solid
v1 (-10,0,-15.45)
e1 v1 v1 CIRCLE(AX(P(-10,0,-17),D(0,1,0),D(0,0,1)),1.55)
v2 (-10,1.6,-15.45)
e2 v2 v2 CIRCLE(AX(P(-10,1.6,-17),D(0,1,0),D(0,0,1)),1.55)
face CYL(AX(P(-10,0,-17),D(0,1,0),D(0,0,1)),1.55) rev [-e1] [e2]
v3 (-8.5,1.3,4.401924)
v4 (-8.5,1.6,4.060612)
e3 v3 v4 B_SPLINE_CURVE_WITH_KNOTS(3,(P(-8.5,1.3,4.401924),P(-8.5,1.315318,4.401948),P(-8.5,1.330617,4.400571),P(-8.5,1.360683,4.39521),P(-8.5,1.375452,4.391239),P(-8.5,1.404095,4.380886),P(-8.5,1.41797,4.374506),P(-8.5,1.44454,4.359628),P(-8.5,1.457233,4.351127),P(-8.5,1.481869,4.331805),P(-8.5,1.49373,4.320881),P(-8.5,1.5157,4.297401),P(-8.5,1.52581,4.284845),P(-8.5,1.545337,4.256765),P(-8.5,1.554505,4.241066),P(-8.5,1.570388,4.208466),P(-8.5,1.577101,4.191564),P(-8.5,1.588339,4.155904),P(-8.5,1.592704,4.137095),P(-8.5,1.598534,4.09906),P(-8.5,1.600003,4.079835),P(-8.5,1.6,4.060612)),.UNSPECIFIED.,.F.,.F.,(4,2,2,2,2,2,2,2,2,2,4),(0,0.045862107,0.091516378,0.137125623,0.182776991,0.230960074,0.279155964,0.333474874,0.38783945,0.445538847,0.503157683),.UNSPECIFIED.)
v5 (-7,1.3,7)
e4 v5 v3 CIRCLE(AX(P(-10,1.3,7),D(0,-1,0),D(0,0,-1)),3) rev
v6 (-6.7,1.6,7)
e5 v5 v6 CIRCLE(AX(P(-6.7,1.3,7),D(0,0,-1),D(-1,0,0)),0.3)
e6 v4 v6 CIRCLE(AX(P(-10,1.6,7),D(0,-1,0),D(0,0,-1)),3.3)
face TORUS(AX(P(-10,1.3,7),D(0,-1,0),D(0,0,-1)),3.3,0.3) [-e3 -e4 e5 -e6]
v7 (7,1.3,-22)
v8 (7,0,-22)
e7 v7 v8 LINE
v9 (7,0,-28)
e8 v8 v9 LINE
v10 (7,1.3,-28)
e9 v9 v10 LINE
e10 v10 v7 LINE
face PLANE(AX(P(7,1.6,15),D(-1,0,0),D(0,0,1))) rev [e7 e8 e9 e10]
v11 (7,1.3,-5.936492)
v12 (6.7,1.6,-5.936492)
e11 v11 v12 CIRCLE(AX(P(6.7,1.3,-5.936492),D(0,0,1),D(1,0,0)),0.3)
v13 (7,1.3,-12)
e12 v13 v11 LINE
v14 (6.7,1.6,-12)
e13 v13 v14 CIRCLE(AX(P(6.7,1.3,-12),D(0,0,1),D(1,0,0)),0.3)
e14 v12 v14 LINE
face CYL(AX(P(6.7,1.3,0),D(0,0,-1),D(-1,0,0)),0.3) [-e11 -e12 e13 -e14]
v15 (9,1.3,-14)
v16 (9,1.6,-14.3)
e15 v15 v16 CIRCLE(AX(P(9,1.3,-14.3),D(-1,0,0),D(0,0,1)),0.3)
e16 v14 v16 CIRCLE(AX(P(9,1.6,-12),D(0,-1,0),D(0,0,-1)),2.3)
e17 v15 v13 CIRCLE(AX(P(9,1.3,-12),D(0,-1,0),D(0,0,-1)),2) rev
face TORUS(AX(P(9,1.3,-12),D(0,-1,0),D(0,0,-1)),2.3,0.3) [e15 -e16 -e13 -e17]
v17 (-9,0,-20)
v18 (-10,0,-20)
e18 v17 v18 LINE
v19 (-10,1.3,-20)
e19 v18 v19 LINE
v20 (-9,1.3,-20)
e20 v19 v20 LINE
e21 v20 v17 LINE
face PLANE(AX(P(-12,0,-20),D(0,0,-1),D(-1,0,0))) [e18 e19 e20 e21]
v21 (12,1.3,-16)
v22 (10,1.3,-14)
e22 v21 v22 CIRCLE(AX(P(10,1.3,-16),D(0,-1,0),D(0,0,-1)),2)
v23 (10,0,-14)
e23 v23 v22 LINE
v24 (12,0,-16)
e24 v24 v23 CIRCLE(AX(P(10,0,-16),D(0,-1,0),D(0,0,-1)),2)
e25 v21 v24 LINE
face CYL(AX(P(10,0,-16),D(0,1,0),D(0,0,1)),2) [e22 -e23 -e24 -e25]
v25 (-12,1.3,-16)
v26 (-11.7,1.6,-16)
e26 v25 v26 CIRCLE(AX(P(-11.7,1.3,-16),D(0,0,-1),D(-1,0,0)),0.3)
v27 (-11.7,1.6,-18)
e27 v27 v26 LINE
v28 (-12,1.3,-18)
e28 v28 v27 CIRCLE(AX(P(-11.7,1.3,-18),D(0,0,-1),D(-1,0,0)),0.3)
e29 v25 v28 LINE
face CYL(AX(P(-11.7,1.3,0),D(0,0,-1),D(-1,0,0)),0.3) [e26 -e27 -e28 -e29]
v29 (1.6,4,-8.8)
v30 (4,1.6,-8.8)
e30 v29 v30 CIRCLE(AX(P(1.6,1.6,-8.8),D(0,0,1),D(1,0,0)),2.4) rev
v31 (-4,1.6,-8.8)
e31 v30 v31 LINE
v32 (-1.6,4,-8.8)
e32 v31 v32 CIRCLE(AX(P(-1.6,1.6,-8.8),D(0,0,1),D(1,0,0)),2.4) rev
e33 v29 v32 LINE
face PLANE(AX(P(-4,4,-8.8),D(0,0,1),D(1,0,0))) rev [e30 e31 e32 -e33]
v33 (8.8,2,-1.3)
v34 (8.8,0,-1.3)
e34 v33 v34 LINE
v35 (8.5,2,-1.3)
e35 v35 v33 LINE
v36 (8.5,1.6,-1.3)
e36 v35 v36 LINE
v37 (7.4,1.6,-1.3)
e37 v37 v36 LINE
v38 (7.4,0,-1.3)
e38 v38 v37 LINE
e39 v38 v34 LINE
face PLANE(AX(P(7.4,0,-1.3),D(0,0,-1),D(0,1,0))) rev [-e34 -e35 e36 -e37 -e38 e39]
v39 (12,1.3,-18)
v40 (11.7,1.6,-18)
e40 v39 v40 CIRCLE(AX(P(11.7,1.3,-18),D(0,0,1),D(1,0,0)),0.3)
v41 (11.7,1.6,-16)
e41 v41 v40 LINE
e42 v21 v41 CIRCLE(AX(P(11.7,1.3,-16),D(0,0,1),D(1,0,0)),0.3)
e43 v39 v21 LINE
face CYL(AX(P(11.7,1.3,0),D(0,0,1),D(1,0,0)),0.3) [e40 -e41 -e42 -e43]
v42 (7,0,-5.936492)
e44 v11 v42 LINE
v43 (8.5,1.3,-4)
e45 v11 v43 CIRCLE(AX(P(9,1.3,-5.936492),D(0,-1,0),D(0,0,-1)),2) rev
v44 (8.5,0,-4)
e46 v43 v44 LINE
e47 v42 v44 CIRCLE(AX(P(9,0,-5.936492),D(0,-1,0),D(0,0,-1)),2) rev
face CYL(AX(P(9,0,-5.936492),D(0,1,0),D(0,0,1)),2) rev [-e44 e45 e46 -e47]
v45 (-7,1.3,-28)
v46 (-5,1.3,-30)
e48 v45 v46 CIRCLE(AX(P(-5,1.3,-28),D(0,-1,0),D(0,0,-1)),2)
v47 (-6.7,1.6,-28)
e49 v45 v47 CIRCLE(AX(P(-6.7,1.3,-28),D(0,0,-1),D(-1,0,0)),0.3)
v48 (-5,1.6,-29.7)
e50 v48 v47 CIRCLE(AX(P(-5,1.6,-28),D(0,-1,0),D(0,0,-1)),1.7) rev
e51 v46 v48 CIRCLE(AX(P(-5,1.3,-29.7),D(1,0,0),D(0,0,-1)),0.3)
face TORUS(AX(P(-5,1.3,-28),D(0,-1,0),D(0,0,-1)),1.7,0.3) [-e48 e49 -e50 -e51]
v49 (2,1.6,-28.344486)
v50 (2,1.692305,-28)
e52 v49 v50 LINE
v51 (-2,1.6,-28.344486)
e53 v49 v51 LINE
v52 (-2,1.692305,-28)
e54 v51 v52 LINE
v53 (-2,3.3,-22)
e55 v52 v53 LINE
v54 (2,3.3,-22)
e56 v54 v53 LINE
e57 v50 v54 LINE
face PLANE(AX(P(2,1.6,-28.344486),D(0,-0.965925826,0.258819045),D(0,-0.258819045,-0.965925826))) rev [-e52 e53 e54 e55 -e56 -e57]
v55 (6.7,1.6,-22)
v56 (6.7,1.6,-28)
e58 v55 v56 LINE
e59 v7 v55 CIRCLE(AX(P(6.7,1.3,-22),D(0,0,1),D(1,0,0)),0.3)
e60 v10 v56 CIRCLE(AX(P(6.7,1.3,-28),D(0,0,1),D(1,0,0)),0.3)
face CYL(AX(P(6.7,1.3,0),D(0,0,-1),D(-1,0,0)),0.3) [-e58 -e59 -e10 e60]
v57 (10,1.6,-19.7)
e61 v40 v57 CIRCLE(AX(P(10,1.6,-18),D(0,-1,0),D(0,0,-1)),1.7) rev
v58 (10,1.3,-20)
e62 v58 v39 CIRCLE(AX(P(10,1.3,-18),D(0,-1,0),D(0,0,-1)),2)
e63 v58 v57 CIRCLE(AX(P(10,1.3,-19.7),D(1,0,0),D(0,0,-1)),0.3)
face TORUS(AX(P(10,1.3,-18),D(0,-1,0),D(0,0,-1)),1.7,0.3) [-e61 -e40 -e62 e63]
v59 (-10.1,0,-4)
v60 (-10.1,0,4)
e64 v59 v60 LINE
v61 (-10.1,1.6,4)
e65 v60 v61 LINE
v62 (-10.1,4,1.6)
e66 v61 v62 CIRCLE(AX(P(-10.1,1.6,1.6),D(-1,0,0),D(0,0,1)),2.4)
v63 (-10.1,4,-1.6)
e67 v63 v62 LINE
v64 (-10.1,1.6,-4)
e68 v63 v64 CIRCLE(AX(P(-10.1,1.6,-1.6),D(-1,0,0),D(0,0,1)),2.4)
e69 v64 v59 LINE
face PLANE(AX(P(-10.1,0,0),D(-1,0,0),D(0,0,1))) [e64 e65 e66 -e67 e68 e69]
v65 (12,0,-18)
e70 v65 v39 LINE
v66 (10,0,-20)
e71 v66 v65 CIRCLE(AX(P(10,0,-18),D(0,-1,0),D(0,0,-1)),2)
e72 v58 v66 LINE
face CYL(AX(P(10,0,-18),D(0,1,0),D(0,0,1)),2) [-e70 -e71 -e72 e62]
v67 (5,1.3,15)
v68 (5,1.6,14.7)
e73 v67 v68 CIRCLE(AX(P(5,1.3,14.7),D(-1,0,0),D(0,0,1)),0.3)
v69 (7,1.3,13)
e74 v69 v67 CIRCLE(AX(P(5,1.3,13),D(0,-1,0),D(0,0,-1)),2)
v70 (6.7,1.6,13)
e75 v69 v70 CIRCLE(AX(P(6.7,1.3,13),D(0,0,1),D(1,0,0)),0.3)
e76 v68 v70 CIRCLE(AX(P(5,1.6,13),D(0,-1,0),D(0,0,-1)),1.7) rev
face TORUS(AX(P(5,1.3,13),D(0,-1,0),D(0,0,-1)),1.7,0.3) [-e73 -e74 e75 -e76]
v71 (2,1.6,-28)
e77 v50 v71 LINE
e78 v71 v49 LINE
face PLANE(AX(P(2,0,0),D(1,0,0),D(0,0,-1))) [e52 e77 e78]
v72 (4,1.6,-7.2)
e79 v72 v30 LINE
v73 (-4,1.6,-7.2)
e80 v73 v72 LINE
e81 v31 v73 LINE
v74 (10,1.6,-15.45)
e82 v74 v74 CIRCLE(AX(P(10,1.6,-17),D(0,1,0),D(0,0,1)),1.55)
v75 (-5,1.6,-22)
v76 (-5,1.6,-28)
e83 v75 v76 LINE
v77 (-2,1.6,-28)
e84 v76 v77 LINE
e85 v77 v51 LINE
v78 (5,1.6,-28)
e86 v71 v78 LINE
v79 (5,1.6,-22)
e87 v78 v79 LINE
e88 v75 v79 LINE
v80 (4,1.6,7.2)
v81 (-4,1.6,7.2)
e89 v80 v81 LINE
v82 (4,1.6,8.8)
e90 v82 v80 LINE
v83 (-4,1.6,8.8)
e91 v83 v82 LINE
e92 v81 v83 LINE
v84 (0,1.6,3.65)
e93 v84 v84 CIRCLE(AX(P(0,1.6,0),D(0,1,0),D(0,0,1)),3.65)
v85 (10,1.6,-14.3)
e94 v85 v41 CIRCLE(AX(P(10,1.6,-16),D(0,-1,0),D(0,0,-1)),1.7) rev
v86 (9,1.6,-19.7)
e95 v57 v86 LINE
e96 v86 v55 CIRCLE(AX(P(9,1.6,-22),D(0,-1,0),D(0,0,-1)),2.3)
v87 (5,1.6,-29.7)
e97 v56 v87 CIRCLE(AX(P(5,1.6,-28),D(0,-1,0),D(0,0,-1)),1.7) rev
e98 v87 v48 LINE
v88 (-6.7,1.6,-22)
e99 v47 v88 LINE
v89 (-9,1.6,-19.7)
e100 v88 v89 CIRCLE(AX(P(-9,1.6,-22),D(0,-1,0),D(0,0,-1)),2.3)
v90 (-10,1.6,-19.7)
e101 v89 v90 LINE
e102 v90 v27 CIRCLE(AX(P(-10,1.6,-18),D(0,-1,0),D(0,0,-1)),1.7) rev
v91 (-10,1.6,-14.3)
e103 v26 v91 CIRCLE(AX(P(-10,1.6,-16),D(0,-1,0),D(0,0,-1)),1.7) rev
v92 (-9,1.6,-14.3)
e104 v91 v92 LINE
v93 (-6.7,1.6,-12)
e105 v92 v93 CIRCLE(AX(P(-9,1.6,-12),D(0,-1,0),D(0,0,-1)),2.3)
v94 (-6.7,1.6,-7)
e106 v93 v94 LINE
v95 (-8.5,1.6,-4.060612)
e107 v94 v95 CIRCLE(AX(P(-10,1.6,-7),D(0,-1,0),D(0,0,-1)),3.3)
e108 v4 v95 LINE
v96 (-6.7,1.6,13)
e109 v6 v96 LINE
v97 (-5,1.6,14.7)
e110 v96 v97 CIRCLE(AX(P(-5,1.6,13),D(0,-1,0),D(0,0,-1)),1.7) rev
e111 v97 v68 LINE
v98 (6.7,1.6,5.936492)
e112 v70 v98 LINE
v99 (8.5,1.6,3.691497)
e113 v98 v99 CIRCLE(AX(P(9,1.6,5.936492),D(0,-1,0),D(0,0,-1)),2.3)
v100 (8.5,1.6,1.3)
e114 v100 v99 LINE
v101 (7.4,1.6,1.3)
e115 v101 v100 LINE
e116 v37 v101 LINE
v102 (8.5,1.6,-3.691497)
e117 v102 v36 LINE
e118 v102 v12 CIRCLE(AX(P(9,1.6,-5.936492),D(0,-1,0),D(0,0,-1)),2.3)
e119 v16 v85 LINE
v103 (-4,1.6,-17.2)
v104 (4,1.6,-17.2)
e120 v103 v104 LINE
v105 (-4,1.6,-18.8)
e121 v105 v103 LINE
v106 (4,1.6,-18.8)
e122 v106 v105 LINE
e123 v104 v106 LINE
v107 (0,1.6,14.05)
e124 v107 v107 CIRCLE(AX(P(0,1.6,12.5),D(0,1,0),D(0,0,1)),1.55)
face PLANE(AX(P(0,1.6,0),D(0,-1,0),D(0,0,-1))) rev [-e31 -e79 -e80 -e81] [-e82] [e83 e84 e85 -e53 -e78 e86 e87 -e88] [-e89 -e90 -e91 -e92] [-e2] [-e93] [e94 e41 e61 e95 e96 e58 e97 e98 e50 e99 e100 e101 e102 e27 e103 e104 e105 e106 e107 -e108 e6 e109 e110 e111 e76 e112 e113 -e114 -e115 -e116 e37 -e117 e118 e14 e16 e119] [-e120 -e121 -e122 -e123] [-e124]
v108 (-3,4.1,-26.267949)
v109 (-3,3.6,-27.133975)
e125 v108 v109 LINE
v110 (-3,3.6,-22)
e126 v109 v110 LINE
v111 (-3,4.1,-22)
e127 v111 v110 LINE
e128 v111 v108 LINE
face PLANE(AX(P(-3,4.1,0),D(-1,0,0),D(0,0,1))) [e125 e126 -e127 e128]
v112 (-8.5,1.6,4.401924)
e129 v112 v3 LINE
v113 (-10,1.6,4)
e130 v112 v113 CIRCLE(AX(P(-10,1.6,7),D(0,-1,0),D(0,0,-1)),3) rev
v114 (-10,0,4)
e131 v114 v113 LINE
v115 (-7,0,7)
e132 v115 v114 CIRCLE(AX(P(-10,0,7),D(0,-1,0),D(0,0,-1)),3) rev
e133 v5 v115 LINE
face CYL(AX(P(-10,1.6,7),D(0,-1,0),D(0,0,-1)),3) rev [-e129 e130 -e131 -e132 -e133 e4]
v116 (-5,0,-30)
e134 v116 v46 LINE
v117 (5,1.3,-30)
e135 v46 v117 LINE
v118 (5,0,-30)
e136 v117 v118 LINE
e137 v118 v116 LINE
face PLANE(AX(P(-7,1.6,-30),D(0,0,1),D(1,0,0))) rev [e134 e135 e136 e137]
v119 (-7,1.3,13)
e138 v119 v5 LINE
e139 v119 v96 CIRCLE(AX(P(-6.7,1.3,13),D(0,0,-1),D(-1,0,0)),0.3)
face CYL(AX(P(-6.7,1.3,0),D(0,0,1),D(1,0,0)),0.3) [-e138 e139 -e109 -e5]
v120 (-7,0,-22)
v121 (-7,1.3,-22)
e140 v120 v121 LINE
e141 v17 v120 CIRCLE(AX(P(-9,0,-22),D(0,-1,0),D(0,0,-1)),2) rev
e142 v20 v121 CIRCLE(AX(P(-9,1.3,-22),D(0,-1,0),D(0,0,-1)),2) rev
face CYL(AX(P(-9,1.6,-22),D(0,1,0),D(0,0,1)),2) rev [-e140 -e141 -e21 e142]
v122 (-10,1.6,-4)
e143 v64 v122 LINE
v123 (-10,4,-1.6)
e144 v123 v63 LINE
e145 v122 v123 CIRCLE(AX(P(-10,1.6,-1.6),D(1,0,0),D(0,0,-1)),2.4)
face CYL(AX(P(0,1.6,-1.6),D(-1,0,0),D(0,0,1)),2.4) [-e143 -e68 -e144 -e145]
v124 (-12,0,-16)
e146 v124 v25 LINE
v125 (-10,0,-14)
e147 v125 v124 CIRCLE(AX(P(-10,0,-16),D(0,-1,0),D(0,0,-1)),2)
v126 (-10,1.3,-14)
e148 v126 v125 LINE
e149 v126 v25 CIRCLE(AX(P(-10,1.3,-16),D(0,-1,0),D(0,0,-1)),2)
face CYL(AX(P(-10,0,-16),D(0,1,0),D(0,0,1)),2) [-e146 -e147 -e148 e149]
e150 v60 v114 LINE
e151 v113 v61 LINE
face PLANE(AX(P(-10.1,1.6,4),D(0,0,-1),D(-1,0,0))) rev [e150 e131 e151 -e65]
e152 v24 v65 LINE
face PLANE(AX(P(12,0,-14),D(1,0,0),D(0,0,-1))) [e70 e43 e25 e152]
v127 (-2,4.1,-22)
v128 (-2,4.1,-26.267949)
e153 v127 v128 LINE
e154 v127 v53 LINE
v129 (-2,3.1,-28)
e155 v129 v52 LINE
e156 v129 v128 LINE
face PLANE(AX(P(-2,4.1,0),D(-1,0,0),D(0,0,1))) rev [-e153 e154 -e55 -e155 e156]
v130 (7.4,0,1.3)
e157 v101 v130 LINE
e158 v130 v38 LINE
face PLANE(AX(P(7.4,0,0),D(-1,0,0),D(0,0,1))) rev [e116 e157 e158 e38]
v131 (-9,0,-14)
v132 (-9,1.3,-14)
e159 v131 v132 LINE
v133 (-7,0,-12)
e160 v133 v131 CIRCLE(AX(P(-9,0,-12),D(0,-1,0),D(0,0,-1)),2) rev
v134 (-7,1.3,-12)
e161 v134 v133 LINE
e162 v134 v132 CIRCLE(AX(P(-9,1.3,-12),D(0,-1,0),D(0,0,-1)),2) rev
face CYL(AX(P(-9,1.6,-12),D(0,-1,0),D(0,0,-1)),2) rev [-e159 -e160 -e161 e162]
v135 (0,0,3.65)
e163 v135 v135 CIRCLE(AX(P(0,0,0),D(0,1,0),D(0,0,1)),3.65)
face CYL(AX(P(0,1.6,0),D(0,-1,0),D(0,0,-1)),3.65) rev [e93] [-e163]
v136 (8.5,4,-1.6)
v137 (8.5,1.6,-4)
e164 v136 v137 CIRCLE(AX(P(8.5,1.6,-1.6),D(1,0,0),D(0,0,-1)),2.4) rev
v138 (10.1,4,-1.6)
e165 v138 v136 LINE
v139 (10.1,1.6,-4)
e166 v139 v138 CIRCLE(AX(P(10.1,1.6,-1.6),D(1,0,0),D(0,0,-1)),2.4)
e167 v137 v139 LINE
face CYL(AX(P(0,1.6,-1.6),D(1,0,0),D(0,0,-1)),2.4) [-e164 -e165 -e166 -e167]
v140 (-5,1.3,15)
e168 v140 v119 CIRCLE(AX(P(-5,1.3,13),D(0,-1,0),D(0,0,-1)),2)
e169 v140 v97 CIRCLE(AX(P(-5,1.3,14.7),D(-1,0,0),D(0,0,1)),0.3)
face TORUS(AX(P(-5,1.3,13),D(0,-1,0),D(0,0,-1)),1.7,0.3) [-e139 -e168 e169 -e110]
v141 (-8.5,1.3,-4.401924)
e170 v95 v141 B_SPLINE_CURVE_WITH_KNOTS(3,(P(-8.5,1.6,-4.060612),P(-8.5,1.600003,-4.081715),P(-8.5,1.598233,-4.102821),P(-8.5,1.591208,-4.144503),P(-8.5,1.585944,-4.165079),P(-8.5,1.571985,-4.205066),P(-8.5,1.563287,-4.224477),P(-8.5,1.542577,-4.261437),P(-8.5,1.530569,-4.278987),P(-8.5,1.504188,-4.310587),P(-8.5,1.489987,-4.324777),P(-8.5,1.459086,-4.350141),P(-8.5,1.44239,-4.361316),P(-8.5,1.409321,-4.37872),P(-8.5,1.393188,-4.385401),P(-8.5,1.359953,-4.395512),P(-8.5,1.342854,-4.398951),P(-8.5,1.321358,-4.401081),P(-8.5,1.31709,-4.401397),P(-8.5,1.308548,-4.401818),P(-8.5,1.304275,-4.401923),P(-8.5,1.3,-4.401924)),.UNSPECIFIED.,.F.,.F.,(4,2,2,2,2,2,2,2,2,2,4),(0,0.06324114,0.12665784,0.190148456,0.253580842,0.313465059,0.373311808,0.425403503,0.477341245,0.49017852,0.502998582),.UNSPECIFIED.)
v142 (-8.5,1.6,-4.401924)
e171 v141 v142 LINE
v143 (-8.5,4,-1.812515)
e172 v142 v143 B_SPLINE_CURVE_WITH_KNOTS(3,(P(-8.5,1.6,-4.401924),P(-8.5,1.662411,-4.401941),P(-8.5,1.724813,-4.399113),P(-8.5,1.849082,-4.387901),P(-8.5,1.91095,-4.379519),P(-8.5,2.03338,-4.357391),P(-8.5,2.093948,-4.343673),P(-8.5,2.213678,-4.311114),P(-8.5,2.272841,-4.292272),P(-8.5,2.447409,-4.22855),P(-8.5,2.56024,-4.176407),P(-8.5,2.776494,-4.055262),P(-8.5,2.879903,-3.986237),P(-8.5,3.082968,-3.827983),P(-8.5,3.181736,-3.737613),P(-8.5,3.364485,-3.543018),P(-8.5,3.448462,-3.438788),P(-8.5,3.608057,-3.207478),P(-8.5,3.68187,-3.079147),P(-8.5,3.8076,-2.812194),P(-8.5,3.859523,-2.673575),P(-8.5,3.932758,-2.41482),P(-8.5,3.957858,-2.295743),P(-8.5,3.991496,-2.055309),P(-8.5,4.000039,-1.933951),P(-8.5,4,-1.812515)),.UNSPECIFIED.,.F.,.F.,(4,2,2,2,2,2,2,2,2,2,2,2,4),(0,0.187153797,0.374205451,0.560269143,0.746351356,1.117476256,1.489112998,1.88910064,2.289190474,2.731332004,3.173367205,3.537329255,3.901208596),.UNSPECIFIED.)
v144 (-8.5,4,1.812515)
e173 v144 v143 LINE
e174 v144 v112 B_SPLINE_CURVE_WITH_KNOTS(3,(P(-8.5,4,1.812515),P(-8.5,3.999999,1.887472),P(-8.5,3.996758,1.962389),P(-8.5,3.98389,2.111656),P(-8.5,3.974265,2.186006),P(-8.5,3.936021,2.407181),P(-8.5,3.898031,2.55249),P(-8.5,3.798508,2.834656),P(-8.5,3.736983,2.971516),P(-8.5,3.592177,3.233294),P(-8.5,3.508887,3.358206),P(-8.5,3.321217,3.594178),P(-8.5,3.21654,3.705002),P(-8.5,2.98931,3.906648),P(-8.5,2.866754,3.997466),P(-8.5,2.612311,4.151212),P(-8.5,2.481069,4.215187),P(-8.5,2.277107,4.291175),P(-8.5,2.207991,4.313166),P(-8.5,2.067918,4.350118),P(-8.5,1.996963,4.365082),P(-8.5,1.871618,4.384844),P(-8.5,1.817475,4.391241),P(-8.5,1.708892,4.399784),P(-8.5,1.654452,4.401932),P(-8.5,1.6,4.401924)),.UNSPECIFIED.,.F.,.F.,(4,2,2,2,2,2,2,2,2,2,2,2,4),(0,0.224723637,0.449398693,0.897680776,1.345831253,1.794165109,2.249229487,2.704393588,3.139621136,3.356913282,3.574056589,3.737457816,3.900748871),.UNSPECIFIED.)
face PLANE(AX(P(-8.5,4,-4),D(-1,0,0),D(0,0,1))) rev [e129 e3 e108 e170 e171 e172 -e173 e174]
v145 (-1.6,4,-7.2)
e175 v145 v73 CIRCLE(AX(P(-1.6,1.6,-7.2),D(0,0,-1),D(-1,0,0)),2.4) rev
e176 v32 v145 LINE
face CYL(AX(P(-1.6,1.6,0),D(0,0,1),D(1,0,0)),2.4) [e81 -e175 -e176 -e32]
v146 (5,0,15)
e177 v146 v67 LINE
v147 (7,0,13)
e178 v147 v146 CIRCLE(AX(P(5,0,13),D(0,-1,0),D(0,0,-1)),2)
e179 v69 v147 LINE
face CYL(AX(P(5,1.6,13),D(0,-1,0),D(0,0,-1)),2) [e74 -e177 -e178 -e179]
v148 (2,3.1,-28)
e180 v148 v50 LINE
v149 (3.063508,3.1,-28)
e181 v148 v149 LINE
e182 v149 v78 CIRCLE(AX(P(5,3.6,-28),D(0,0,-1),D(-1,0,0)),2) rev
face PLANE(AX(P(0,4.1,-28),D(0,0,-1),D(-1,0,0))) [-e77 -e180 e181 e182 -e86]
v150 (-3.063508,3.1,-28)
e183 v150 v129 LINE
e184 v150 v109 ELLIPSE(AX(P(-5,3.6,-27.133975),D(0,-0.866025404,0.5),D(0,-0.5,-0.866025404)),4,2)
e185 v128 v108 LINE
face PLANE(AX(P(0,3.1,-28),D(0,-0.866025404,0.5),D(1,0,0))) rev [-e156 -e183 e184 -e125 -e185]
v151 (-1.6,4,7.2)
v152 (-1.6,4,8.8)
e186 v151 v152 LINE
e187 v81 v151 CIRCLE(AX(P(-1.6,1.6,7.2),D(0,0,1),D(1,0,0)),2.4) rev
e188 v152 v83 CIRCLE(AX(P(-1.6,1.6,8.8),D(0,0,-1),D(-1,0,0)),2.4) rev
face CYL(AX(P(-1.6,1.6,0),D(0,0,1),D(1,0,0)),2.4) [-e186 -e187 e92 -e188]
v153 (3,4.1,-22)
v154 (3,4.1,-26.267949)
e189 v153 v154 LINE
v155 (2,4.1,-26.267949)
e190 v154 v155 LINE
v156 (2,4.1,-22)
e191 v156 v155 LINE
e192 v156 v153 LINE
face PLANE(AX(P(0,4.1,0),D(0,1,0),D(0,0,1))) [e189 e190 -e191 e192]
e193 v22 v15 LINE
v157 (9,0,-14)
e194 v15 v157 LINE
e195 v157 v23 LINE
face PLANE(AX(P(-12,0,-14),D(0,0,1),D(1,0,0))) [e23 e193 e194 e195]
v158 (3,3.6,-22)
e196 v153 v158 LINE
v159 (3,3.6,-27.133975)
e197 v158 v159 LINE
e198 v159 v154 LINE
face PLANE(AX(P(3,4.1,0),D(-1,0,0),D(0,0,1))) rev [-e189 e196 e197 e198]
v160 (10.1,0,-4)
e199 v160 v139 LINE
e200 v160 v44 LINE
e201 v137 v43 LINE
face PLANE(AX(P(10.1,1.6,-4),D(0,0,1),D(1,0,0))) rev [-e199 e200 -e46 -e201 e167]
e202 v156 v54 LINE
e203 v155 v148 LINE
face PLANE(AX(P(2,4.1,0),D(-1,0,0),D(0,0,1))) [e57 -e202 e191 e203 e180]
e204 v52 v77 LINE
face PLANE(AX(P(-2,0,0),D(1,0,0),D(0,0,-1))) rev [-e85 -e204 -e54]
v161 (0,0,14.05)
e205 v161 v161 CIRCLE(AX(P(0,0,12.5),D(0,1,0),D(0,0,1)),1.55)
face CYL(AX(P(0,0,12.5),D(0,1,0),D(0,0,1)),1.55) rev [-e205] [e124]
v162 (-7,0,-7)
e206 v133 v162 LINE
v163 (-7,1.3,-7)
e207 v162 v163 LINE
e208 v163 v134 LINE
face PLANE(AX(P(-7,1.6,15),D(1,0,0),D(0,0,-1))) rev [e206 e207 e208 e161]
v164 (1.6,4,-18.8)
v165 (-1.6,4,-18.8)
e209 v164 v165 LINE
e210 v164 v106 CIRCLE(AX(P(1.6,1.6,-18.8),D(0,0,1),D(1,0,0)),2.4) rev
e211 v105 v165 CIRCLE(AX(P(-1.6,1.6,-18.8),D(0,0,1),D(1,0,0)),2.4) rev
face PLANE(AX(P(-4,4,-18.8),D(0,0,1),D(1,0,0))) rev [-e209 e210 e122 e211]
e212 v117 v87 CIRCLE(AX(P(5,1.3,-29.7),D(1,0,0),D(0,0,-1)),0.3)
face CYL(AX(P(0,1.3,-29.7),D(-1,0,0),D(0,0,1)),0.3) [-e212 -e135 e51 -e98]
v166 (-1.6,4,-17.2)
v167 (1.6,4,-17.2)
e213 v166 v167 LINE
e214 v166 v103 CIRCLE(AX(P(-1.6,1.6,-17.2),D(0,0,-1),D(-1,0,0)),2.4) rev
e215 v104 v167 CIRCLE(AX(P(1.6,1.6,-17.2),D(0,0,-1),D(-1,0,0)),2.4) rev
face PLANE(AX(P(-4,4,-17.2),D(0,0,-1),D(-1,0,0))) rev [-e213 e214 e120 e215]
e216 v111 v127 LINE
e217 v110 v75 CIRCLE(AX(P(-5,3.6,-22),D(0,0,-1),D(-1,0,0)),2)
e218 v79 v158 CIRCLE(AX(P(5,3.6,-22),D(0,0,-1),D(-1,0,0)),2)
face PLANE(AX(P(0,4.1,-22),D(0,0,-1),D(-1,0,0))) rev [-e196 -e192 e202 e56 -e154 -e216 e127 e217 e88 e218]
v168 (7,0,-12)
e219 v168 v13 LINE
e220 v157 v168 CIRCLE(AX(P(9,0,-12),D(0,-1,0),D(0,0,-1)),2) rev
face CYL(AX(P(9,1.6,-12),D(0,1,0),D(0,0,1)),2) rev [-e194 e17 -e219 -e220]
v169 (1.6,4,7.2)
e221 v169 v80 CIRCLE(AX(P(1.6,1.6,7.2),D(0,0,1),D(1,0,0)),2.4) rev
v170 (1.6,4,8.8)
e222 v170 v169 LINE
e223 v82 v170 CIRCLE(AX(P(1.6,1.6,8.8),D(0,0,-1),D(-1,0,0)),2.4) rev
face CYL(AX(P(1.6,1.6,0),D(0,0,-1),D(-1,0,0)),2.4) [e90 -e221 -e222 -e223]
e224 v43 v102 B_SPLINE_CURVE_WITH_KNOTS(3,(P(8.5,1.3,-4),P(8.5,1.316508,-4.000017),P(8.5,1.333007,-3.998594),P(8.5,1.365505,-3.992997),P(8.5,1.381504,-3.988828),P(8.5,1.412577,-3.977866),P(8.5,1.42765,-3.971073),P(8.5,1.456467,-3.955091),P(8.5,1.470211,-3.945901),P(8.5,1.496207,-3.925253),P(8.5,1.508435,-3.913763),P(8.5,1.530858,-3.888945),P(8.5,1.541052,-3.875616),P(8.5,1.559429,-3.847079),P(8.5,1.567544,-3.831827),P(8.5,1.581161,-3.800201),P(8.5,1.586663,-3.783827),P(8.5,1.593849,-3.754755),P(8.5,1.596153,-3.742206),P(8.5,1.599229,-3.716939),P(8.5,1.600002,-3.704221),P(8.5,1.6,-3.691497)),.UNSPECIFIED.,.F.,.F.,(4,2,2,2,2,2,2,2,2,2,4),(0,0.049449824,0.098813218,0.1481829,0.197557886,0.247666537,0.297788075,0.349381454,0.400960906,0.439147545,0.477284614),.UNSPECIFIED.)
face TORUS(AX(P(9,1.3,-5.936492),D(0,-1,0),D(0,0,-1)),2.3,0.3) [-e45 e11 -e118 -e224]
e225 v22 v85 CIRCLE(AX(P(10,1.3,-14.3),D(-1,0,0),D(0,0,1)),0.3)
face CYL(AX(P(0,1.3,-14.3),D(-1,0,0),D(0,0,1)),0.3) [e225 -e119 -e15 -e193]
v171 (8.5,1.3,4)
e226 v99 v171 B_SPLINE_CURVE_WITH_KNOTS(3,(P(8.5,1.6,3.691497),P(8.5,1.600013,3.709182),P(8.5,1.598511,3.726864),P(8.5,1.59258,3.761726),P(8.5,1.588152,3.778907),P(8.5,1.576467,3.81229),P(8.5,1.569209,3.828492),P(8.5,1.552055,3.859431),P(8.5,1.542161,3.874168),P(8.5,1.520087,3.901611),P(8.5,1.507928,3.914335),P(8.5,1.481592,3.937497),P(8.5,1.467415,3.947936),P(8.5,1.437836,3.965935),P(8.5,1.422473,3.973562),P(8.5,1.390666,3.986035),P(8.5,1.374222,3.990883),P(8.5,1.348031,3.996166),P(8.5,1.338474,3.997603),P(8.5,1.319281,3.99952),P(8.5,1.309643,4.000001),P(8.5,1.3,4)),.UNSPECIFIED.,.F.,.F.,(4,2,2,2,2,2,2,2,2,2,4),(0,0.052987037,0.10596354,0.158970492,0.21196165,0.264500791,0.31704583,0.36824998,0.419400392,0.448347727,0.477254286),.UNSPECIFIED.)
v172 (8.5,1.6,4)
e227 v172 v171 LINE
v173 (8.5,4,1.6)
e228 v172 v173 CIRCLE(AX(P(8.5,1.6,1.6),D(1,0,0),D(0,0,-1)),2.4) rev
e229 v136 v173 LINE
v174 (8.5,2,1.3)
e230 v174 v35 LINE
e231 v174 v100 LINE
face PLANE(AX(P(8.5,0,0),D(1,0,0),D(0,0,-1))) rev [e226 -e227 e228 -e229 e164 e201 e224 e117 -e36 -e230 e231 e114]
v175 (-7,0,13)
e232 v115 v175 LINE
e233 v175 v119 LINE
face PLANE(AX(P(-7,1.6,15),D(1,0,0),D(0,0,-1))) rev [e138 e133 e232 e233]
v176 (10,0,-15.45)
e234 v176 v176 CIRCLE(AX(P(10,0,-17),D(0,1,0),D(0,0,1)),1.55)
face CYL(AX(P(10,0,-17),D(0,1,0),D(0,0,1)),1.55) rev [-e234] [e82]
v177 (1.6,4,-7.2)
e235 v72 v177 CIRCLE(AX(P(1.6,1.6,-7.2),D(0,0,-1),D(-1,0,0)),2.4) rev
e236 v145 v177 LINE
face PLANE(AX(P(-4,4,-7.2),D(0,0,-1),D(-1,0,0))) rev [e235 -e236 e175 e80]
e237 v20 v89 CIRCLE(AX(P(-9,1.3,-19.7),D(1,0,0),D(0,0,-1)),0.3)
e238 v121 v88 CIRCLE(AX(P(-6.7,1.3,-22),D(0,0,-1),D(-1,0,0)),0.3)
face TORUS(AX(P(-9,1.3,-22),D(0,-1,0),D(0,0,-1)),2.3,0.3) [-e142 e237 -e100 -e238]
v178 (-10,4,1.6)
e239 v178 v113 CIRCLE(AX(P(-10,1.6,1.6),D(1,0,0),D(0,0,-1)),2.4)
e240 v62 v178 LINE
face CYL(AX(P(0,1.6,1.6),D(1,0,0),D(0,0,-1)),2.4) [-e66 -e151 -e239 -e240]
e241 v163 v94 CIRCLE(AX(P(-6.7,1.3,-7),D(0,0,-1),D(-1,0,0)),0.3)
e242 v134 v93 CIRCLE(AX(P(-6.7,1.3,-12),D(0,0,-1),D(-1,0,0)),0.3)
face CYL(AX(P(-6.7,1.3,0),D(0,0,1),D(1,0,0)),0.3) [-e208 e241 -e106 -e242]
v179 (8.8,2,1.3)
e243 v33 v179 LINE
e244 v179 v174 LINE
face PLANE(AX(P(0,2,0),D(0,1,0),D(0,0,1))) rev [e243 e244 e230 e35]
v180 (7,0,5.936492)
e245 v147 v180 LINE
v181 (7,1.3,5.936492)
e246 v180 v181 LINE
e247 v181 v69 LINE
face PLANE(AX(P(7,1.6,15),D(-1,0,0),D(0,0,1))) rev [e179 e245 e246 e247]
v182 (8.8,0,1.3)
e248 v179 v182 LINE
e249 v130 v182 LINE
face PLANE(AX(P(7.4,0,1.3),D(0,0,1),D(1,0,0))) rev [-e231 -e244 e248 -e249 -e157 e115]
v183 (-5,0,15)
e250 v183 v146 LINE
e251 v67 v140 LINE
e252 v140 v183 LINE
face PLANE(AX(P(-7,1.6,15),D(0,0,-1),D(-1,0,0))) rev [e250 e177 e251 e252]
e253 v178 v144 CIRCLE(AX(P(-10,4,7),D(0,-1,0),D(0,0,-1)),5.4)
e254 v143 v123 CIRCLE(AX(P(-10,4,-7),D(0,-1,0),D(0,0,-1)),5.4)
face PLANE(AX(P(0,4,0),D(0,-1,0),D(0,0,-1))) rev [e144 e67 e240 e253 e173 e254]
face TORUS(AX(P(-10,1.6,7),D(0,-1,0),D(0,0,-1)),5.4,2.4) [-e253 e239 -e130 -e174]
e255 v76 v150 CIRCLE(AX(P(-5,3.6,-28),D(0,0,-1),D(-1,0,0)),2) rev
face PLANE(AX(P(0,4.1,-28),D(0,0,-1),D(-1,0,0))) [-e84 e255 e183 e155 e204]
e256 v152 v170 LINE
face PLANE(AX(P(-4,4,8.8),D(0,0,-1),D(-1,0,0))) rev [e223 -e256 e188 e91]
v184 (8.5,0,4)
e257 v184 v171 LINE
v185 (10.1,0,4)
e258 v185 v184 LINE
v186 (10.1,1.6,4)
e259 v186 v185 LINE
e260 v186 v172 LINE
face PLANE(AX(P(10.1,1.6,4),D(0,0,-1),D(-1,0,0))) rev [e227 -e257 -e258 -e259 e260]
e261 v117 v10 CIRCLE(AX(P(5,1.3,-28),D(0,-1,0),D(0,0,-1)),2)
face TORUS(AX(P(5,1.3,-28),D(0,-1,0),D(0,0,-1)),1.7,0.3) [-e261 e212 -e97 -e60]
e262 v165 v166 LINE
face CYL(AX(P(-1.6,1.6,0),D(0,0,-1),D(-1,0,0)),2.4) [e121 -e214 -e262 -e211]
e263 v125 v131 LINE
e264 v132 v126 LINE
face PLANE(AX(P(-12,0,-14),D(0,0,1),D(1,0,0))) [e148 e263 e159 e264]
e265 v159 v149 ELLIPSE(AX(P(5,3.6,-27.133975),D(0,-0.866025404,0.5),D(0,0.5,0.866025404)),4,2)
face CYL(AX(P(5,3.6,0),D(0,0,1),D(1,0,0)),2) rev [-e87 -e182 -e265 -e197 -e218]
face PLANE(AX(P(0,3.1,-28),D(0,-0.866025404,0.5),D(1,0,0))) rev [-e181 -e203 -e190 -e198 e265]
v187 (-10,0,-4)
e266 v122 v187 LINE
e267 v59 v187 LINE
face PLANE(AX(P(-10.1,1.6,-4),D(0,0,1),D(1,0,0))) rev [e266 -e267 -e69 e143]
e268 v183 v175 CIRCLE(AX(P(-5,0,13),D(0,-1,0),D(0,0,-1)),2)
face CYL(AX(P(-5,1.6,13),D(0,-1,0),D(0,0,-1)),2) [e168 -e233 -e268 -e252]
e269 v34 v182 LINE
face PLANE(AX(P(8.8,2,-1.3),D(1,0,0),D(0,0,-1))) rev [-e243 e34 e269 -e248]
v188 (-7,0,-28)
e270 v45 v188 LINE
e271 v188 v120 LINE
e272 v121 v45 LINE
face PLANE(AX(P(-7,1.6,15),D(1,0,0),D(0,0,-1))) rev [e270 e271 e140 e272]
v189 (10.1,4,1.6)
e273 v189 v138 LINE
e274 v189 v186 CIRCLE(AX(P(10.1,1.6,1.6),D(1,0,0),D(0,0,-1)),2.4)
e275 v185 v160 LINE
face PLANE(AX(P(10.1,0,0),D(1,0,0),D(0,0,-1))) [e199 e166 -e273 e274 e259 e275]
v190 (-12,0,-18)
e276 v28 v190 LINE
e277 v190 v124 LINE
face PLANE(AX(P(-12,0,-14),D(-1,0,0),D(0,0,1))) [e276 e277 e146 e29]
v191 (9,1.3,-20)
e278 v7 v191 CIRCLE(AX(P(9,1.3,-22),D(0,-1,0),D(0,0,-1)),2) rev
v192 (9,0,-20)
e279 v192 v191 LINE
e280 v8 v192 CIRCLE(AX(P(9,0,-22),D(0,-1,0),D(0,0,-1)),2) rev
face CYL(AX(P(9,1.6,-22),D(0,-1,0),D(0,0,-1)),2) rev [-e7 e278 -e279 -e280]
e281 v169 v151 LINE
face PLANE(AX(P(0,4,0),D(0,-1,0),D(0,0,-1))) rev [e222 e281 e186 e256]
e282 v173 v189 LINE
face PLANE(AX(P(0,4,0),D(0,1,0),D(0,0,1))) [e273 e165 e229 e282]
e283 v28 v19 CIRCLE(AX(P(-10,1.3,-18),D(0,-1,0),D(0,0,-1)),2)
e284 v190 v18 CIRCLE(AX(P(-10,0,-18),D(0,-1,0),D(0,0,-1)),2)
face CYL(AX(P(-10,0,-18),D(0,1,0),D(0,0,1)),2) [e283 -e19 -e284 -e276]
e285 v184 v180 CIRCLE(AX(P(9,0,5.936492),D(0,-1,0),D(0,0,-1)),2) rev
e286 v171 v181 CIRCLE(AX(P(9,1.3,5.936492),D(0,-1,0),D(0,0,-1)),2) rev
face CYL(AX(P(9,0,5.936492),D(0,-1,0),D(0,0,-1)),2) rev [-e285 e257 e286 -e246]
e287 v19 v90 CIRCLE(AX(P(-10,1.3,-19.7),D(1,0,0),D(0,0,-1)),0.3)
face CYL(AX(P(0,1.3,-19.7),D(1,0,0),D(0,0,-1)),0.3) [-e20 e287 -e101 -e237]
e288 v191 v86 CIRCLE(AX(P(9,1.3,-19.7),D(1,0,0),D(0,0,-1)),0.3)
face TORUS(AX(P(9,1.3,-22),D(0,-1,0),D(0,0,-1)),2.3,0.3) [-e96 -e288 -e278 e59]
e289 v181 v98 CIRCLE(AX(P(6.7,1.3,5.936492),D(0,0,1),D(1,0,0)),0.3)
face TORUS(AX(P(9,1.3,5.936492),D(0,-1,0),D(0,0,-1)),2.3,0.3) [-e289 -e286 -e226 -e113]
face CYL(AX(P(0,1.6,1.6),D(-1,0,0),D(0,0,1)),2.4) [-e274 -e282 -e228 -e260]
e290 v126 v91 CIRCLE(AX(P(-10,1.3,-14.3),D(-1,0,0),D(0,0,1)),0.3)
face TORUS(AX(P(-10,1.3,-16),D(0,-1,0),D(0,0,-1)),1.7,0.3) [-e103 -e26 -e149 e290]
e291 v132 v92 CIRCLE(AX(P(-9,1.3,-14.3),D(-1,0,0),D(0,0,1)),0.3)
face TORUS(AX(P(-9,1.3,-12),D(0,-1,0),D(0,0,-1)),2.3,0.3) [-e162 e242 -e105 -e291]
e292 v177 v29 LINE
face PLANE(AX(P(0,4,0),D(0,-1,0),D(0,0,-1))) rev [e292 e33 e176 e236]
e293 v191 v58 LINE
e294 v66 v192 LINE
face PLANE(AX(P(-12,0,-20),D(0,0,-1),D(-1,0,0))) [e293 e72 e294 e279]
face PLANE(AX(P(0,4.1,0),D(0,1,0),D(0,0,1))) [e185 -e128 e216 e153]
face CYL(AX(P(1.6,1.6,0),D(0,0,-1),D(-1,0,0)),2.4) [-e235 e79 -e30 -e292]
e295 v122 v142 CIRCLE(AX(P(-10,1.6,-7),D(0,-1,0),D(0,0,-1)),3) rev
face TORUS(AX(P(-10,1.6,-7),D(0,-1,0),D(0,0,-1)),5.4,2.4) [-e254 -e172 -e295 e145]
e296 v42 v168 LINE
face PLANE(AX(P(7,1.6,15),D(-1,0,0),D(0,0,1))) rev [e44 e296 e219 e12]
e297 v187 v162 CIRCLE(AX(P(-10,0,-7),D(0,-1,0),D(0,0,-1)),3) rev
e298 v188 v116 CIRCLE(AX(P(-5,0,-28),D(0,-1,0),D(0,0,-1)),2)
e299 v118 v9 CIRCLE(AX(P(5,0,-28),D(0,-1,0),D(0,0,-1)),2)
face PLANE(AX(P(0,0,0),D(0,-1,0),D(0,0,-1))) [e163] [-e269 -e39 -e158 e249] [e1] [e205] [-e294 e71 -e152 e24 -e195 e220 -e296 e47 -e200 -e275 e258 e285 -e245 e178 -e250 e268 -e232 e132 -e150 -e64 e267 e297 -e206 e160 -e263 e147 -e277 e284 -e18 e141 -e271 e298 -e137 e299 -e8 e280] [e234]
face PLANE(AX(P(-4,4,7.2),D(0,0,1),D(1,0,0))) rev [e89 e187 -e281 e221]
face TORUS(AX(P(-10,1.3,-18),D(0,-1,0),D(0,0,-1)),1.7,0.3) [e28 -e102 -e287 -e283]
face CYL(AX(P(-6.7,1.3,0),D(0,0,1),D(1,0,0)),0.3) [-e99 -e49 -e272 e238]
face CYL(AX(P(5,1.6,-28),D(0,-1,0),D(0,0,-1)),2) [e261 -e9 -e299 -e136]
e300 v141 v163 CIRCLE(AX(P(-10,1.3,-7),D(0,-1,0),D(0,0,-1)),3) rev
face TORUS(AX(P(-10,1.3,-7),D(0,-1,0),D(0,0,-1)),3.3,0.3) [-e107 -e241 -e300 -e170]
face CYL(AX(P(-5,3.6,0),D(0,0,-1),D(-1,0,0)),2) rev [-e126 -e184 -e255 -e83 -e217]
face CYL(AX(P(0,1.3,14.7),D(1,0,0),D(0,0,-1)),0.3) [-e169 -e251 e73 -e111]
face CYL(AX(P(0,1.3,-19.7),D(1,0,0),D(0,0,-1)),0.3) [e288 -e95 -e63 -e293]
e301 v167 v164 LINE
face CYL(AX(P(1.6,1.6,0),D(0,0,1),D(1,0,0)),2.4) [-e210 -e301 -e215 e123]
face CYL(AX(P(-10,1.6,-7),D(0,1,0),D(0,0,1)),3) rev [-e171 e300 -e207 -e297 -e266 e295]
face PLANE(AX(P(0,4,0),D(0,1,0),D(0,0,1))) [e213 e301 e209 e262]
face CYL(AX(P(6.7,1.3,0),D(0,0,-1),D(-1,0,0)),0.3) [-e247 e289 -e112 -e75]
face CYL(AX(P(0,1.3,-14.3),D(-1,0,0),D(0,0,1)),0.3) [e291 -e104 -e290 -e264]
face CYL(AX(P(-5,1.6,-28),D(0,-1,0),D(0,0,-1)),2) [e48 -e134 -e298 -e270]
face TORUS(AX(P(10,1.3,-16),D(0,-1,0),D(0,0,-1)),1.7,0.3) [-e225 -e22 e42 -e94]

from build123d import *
from OCP.BRepFilletAPI import BRepFilletAPI_MakeChamfer

# Parameters (mm, degrees)
SKETCH1_W            = 14
SKETCH1_H            = 45
BOSS_EXTRUDE1_DEPTH  = 1.6
SKETCH2_R            = 3.65
CUT_EXTRUDE1_DEPTH   = 31.847366176
SKETCH5_W            = 24
SKETCH5_H            = 6
BOSS_EXTRUDE4_DEPTH  = 1.6
SKETCH6_R            = 1.55
CUT_EXTRUDE2_DEPTH   = 33.350579593
SKETCH10_W           = 8
SKETCH10_H           = 1.6
BOSS_EXTRUDE8_DEPTH  = 1.5
SKETCH11_W           = 2.6
SKETCH11_H           = 1.6
CUT_EXTRUDE3_DEPTH   = 1.1
FILLET1_R            = 2
SKETCH12_W           = 8
SKETCH12_H           = 1.6
BOSS_EXTRUDE9_DEPTH  = 1.6
SKETCH13_W           = 8
SKETCH13_H           = 1.6
BOSS_EXTRUDE10_DEPTH = 3.1
SKETCH7_W            = 8
SKETCH7_H            = 1.6
SKETCH7_W_2          = 1.6
SKETCH7_H_2          = 8
BOSS_EXTRUDE5_DEPTH  = 2.4
FILLET6_R            = 3
FILLET2_R            = 0.3
FILLET4_R            = 2.4
SKETCH8_W            = 1
SKETCH8_H            = 6
BOSS_EXTRUDE6_DEPTH  = 2.5
BOSS_EXTRUDE7_DEPTH  = 4
CHAMFER1_SIZE        = 1
CHAMFER1_SIZE2       = 1.732050808
FILLET5_R            = 2
SKETCH14_W           = 0.3
SKETCH14_H           = 2.6
CUT_EXTRUDE4_DEPTH   = 2


# Some blends are built 0.0001 mm under size
with BuildPart() as part:
    # Sketch1 → Boss-Extrude1 (new body)
    with BuildSketch(Plane(origin=(0, 0, 0), x_dir=(1, 0, 0), z_dir=(0, 1, 0))):
        with Locations((0, 7.5)):
            Rectangle(SKETCH1_W, SKETCH1_H)
    extrude(amount=BOSS_EXTRUDE1_DEPTH)

    # Sketch2 → Cut-Extrude1 (cut, through all)
    with BuildSketch(Plane(origin=(0, 0, 0), x_dir=(1, 0, 0), z_dir=(0, 1, 0))):
        with Locations(Location((0, 0, 0), (0, 0, 270))):
            Circle(SKETCH2_R)
    extrude(amount=CUT_EXTRUDE1_DEPTH, mode=Mode.SUBTRACT)

    # Sketch5 → Boss-Extrude4 (add)
    with BuildSketch(Plane(origin=(0, 1.6, 0), x_dir=(1, 0, 0), z_dir=(0, 1, 0))):
        with Locations((0, 17)):
            Rectangle(SKETCH5_W, SKETCH5_H)
    extrude(amount=-BOSS_EXTRUDE4_DEPTH)

    # Sketch6 → Cut-Extrude2 (cut, through all)
    with BuildSketch(Plane(origin=(0, 1.6, 0), x_dir=(1, 0, 0), z_dir=(0, 1, 0))):
        with Locations(Location((-10, 17, 0), (0, 0, 270))):
            Circle(SKETCH6_R)
        with Locations(Location((10, 17, 0), (0, 0, 270))):
            Circle(SKETCH6_R)
        with Locations(Location((0, -12.5, 0), (0, 0, 270))):
            Circle(SKETCH6_R)
    extrude(amount=-CUT_EXTRUDE2_DEPTH, mode=Mode.SUBTRACT)

    # Sketch10 → Boss-Extrude8 (add)
    with BuildSketch(Plane.ZY.offset(-7)):
        with Locations((0, 0.8)):
            Rectangle(SKETCH10_W, SKETCH10_H)
    extrude(amount=-BOSS_EXTRUDE8_DEPTH)

    # Sketch11 → Cut-Extrude3 (cut)
    with BuildSketch(Plane(origin=(8.5, 0, 0), x_dir=(0, 0, -1), z_dir=(1, 0, 0))):
        with Locations((0, 0.8)):
            Rectangle(SKETCH11_W, SKETCH11_H)
    extrude(amount=-CUT_EXTRUDE3_DEPTH, mode=Mode.SUBTRACT)

    # Fillet1
    # the kernel refuses this fillet: 2 mm, written as the material it adds along each edge
    with BuildSketch(Plane(origin=(7, 0, -14), x_dir=(1, 0, 0), z_dir=(0, 1, 0)), Plane(origin=(-7, 0, -20), x_dir=(-1, 0, 0), z_dir=(0, 1, 0))) as fillet1_piece_1:
        with BuildLine():
            CenterArc((FILLET1_R, -FILLET1_R), FILLET1_R, 90, 90)
            Line((0, -FILLET1_R), (0, 0))
            Line((0, 0), (FILLET1_R, 0))
        make_face()
    extrude(amount=1.6)
    with BuildSketch(Plane(origin=(7, 1.6, -20), x_dir=(0, 0, -1), z_dir=(0, -1, 0)), Plane(origin=(-7, 1.6, -14), x_dir=(0, 0, 1), z_dir=(0, -1, 0))) as fillet1_piece_2:
        with BuildLine():
            CenterArc((FILLET1_R, FILLET1_R), FILLET1_R, 180, 90)
            Line((0, FILLET1_R), (0, 0))
            Line((0, 0), (FILLET1_R, 0))
        make_face()
    extrude(amount=1.6)
    with BuildSketch(Plane(origin=(7, 0, -4), x_dir=(0, 0, -1), z_dir=(0, 1, 0)), Plane(origin=(7, 1.6, 4), x_dir=(0, 0, 1), z_dir=(0, -1, 0))) as fillet1_piece_3:
        with BuildLine():
            CenterArc((1.936491673, -2), FILLET1_R, 90, 75.522487814)
            Line((0, -1.5), (0, 0))
            Line((0, 0), (1.936491673, 0))
        make_face()
    extrude(amount=1.6)
    # the kernel refuses this fillet: 2 mm, written as the material it takes off along each edge
    with BuildSketch(Plane(origin=(-7, -5, 15), x_dir=(1, 0, 0), z_dir=(0, 1, 0)), Plane(origin=(7, -5, -30), x_dir=(-1, 0, 0), z_dir=(0, 1, 0)), Plane(origin=(-7, -5, -30), x_dir=(0, 0, 1), z_dir=(0, 1, 0))) as fillet1_2_piece_1:
        with BuildLine():
            CenterArc((FILLET1_R, FILLET1_R), FILLET1_R, 180, 90)
            Line((0, FILLET1_R), (0, 0))
            Line((0, 0), (FILLET1_R, 0))
        make_face()
    extrude(amount=11.6, mode=Mode.SUBTRACT)
    with BuildSketch(Plane(origin=(7, -5, 15), x_dir=(-1, 0, 0), z_dir=(0, 1, 0)), Plane(origin=(12, 6.6, -14), x_dir=(0, 0, -1), z_dir=(0, -1, 0)), Plane(origin=(12, 6.6, -20), x_dir=(-1, 0, 0), z_dir=(0, -1, 0)), Plane(origin=(-12, 6.6, -20), x_dir=(0, 0, 1), z_dir=(0, -1, 0)), Plane(origin=(-12, 6.6, -14), x_dir=(1, 0, 0), z_dir=(0, -1, 0))) as fillet1_2_piece_2:
        with BuildLine():
            CenterArc((FILLET1_R, -FILLET1_R), FILLET1_R, 90, 90)
            Line((0, -FILLET1_R), (0, 0))
            Line((0, 0), (FILLET1_R, 0))
        make_face()
    extrude(amount=11.6, mode=Mode.SUBTRACT)

    # Sketch12 → Boss-Extrude9 (add)
    with BuildSketch(Plane(origin=(8.5, 0, 0), x_dir=(0, 0, -1), z_dir=(1, 0, 0))):
        with Locations((0, 0.8)):
            Rectangle(SKETCH12_W, SKETCH12_H)
    extrude(amount=BOSS_EXTRUDE9_DEPTH)

    # Sketch13 → Boss-Extrude10 (add)
    with BuildSketch(Plane.ZY.offset(7)):
        with Locations((0, 0.8)):
            Rectangle(SKETCH13_W, SKETCH13_H)
    extrude(amount=BOSS_EXTRUDE10_DEPTH)

    # Sketch7 → Boss-Extrude5 (add)
    with BuildSketch(Plane(origin=(0, 1.6, 0), x_dir=(1, 0, 0), z_dir=(0, 1, 0))):
        with Locations((0, 8)):
            Rectangle(SKETCH7_W, SKETCH7_H)
        with Locations((0, 18)):
            Rectangle(SKETCH7_W, SKETCH7_H)
        with Locations((0, -8)):
            Rectangle(SKETCH7_W, SKETCH7_H)
        with Locations((-9.3, 0)):
            Rectangle(SKETCH7_W_2, SKETCH7_H_2)
        with Locations((9.3, 0)):
            Rectangle(SKETCH7_W_2, SKETCH7_H_2)
    extrude(amount=BOSS_EXTRUDE5_DEPTH)

    # Fillet6
    # the kernel refuses this fillet: 3 mm, written as the material it adds along each edge
    with BuildSketch(Plane(origin=(-7, 0, -4), x_dir=(-1, 0, 0), z_dir=(0, 1, 0))) as fillet6_piece_1_section:
        with BuildLine():
            CenterArc((FILLET6_R, -FILLET6_R), FILLET6_R, 90, 90)
            Line((0, -FILLET6_R), (0, 0))
            Line((0, 0), (FILLET6_R, 0))
        make_face()
    fillet6_piece_1 = extrude(amount=1.6, mode=Mode.PRIVATE)
    fillet6_piece_1 = split(fillet6_piece_1, bisect_by=Plane(origin=(-8.5, 0, -4), z_dir=(-1, 0, 0)), keep=Keep.TOP, mode=Mode.PRIVATE)
    add(fillet6_piece_1)
    with BuildSketch(Plane(origin=(-7, 0, -4), x_dir=(-1, 0, 0), z_dir=(0, 1, 0))) as fillet6_piece_2_section:
        with BuildLine():
            CenterArc((FILLET6_R, -FILLET6_R), FILLET6_R, 90, 90)
            Line((0, -FILLET6_R), (0, 0))
            Line((0, 0), (FILLET6_R, 0))
        make_face()
    fillet6_piece_2 = extrude(amount=1.6, mode=Mode.PRIVATE)
    fillet6_piece_2 = split(fillet6_piece_2, bisect_by=Plane(origin=(-8.5, 0, -4), z_dir=(1, 0, 0)), keep=Keep.TOP, mode=Mode.PRIVATE)
    add(fillet6_piece_2)
    with BuildSketch(Plane(origin=(-7, 0, -4), x_dir=(-1, 0, 0), z_dir=(0, 1, 0))) as fillet6_piece_3_section:
        with BuildLine():
            CenterArc((FILLET6_R, -FILLET6_R), FILLET6_R, 90, 90)
            Line((0, -FILLET6_R), (0, 0))
            Line((0, 0), (FILLET6_R, 0))
        make_face()
    fillet6_piece_3 = extrude(amount=9.1, mode=Mode.PRIVATE)
    fillet6_piece_3 = split(fillet6_piece_3, bisect_by=Plane(origin=(-7, 1.6, -4), z_dir=(0, 1, 0)), keep=Keep.TOP, mode=Mode.PRIVATE)
    fillet6_piece_3 = split(fillet6_piece_3, bisect_by=Plane(origin=(-7, 4, -4), z_dir=(0, -1, 0)), keep=Keep.TOP, mode=Mode.PRIVATE)
    fillet6_piece_3 = split(fillet6_piece_3, bisect_by=Plane(origin=(-8.5, 0, -4), z_dir=(-1, 0, 0)), keep=Keep.TOP, mode=Mode.PRIVATE)
    add(fillet6_piece_3)
    with BuildSketch(Plane(origin=(-7, 9.1, 4), x_dir=(0, 0, 1), z_dir=(0, -1, 0))) as fillet6_piece_4_section:
        with BuildLine():
            CenterArc((FILLET6_R, FILLET6_R), FILLET6_R, 180, 90)
            Line((0, FILLET6_R), (0, 0))
            Line((0, 0), (FILLET6_R, 0))
        make_face()
    fillet6_piece_4 = extrude(amount=9.1, mode=Mode.PRIVATE)
    fillet6_piece_4 = split(fillet6_piece_4, bisect_by=Plane(origin=(-7, 1.6, 4), z_dir=(0, 1, 0)), keep=Keep.TOP, mode=Mode.PRIVATE)
    fillet6_piece_4 = split(fillet6_piece_4, bisect_by=Plane(origin=(-8.5, 9.1, 4), z_dir=(-1, 0, 0)), keep=Keep.TOP, mode=Mode.PRIVATE)
    fillet6_piece_4 = split(fillet6_piece_4, bisect_by=Plane(origin=(-7, 4, 4), z_dir=(0, -1, 0)), keep=Keep.TOP, mode=Mode.PRIVATE)
    add(fillet6_piece_4)
    with BuildSketch(Plane(origin=(-7, 1.6, 4), x_dir=(0, 0, 1), z_dir=(0, -1, 0))) as fillet6_piece_5_section:
        with BuildLine():
            CenterArc((FILLET6_R, FILLET6_R), FILLET6_R, 180, 90)
            Line((0, FILLET6_R), (0, 0))
            Line((0, 0), (FILLET6_R, 0))
        make_face()
    fillet6_piece_5 = extrude(amount=1.6, mode=Mode.PRIVATE)
    fillet6_piece_5 = split(fillet6_piece_5, bisect_by=Plane(origin=(-8.5, 1.6, 4), z_dir=(1, 0, 0)), keep=Keep.TOP, mode=Mode.PRIVATE)
    add(fillet6_piece_5)
    with BuildSketch(Plane(origin=(-7, 1.6, 4), x_dir=(0, 0, 1), z_dir=(0, -1, 0))) as fillet6_piece_6_section:
        with BuildLine():
            CenterArc((FILLET6_R, FILLET6_R), FILLET6_R, 180, 90)
            Line((0, FILLET6_R), (0, 0))
            Line((0, 0), (FILLET6_R, 0))
        make_face()
    fillet6_piece_6 = extrude(amount=1.6, mode=Mode.PRIVATE)
    fillet6_piece_6 = split(fillet6_piece_6, bisect_by=Plane(origin=(-8.5, 1.6, 4), z_dir=(-1, 0, 0)), keep=Keep.TOP, mode=Mode.PRIVATE)
    add(fillet6_piece_6)

    # Fillet2
    fillet2_edges = [part.edges().sort_by_distance(p)[0] for p in [
        (0, 1.6, 15),
        (9.5, 1.6, -14),
        (12, 1.6, -17),
        (9.5, 1.6, -20),
        (7, 1.6, -25),
        (0, 1.6, -30),
        (-7, 1.6, -25),
        (-9.5, 1.6, -20),
        (-12, 1.6, -17),
        (-9.5, 1.6, -14),
        (-7, 1.6, -9.5),
        (-6.414213562, 1.6, 14.414213562),
        (-11.414213562, 1.6, -14.585786438),
        (-11.414213562, 1.6, -19.414213562),
        (11.414213562, 1.6, -19.414213562),
        (11.414213562, 1.6, -14.585786438),
        (-6.414213562, 1.6, -29.414213562),
        (6.414213562, 1.6, -29.414213562),
        (6.414213562, 1.6, 14.414213562),
        (7.41886117, 1.6, -4.711746802),
        (7.41886117, 1.6, 4.711746802),
        (7.585786438, 1.6, -13.414213562),
        (7.585786438, 1.6, -20.585786438),
        (-7.585786438, 1.6, -20.585786438),
        (-7.585786438, 1.6, -13.414213562),
        (-7, 1.6, 10),
        (-7.401923789, 1.6, -5.5),
        (-7.401923789, 1.6, 5.5),
        (7, 1.6, -8.968245837),
        (7, 1.6, 9.468245837),
    ]]
    fillet(fillet2_edges, radius=FILLET2_R)

    # Fillet4
    fillet4_edges = [part.edges().sort_by_distance(p)[0] for p in [
        (4, 4, -18),
        (4, 4, -8),
        (-4, 4, -8),
        (-4, 4, -18),
        (4, 4, 8),
        (-4, 4, 8),
        (9.3, 4, -4),
        (9.3, 4, 4),
        (-10.05, 4, 4),
        (-10.05, 4, -4),
        (-9.223542865, 4, 4.102222521),
        (-9.223542865, 4, -4.102222521),
    ]]
    fillet(fillet4_edges, radius=FILLET4_R - 0.0001)  # a hair under: the kernel refuses the full size

    # Sketch8 → Boss-Extrude6 (add)
    with BuildSketch(Plane(origin=(0, 1.6, 0), x_dir=(1, 0, 0), z_dir=(0, 1, 0))):
        with Locations((-2.5, 25)):
            Rectangle(SKETCH8_W, SKETCH8_H)
        with Locations((2.5, 25)):
            Rectangle(SKETCH8_W, SKETCH8_H)
    extrude(amount=BOSS_EXTRUDE6_DEPTH)

    # Sketch9 → Boss-Extrude7 (add)
    with BuildSketch(Plane(origin=(-2, 0, 0), x_dir=(0, 0, -1), z_dir=(1, 0, 0))):
        Polygon((22, 1.6), (28.344486373, 1.6), (22, 3.3), align=None)
    extrude(amount=BOSS_EXTRUDE7_DEPTH)

    # Chamfer1: one chamfer whose edges measure the first distance from different faces: ONE call of the kernel's chamfer builder (chamfer() names one face for all edges)
    chamfer1_edges_1 = [part.edges().sort_by_distance(p)[0] for p in [
        (-2.5, 4.1, -28),
    ]]
    chamfer1_side_1 = [part.faces().sort_by_distance(p)[0] for p in [
        (-2.5, 2.85, -28),
    ]]
    chamfer1_edges_2 = [part.edges().sort_by_distance(p)[0] for p in [
        (2.5, 4.1, -28),
    ]]
    chamfer1_side_2 = [part.faces().sort_by_distance(p)[0] for p in [
        (2.5, 2.85, -28),
    ]]
    chamfer1 = BRepFilletAPI_MakeChamfer(part.part.solid().wrapped)
    for e in chamfer1_edges_1:
        chamfer1.Add(CHAMFER1_SIZE, CHAMFER1_SIZE2, e.wrapped, chamfer1_side_1[0].wrapped)  # the first distance lies on this face
    for e in chamfer1_edges_2:
        chamfer1.Add(CHAMFER1_SIZE, CHAMFER1_SIZE2, e.wrapped, chamfer1_side_2[0].wrapped)  # the first distance lies on this face
    add(Compound.cast(chamfer1.Shape()), mode=Mode.REPLACE)

    # Fillet5
    # the kernel refuses this fillet: 2 mm, written as the material it adds along each edge
    with BuildSketch(Plane(origin=(3, 1.6, -22), x_dir=(0, 1, 0), z_dir=(0, 0, -1))) as fillet5_piece_1_section:
        with BuildLine():
            CenterArc((FILLET5_R, FILLET5_R), FILLET5_R, 180, 90)
            Line((0, FILLET5_R), (0, 0))
            Line((0, 0), (FILLET5_R, 0))
        make_face()
    fillet5_piece_1 = extrude(amount=6, mode=Mode.PRIVATE)
    fillet5_piece_1 = split(fillet5_piece_1, bisect_by=Plane(origin=(3, 5.323076211, -24.149519053), z_dir=(0, -0.8660254037844397, 0.4999999999999982)), keep=Keep.TOP, mode=Mode.PRIVATE)
    add(fillet5_piece_1)
    with BuildSketch(Plane(origin=(-3, 1.6, -28), x_dir=(-1, 0, 0), z_dir=(0, 0, 1))) as fillet5_piece_2_section:
        with BuildLine():
            CenterArc((FILLET5_R, -FILLET5_R), FILLET5_R, 90, 90)
            Line((0, -FILLET5_R), (0, 0))
            Line((0, 0), (FILLET5_R, 0))
        make_face()
    fillet5_piece_2 = extrude(amount=6, mode=Mode.PRIVATE)
    fillet5_piece_2 = split(fillet5_piece_2, bisect_by=Plane(origin=(-3, 2.725, -28.649519053), z_dir=(0, -0.8660254037844397, 0.4999999999999982)), keep=Keep.TOP, mode=Mode.PRIVATE)
    add(fillet5_piece_2)

    # Sketch14 → Cut-Extrude4 (cut)
    with BuildSketch(Plane.XZ):
        with Locations((8.65, 0)):
            Rectangle(SKETCH14_W, SKETCH14_H)
    extrude(amount=-CUT_EXTRUDE4_DEPTH, mode=Mode.SUBTRACT)


solid = part.part
